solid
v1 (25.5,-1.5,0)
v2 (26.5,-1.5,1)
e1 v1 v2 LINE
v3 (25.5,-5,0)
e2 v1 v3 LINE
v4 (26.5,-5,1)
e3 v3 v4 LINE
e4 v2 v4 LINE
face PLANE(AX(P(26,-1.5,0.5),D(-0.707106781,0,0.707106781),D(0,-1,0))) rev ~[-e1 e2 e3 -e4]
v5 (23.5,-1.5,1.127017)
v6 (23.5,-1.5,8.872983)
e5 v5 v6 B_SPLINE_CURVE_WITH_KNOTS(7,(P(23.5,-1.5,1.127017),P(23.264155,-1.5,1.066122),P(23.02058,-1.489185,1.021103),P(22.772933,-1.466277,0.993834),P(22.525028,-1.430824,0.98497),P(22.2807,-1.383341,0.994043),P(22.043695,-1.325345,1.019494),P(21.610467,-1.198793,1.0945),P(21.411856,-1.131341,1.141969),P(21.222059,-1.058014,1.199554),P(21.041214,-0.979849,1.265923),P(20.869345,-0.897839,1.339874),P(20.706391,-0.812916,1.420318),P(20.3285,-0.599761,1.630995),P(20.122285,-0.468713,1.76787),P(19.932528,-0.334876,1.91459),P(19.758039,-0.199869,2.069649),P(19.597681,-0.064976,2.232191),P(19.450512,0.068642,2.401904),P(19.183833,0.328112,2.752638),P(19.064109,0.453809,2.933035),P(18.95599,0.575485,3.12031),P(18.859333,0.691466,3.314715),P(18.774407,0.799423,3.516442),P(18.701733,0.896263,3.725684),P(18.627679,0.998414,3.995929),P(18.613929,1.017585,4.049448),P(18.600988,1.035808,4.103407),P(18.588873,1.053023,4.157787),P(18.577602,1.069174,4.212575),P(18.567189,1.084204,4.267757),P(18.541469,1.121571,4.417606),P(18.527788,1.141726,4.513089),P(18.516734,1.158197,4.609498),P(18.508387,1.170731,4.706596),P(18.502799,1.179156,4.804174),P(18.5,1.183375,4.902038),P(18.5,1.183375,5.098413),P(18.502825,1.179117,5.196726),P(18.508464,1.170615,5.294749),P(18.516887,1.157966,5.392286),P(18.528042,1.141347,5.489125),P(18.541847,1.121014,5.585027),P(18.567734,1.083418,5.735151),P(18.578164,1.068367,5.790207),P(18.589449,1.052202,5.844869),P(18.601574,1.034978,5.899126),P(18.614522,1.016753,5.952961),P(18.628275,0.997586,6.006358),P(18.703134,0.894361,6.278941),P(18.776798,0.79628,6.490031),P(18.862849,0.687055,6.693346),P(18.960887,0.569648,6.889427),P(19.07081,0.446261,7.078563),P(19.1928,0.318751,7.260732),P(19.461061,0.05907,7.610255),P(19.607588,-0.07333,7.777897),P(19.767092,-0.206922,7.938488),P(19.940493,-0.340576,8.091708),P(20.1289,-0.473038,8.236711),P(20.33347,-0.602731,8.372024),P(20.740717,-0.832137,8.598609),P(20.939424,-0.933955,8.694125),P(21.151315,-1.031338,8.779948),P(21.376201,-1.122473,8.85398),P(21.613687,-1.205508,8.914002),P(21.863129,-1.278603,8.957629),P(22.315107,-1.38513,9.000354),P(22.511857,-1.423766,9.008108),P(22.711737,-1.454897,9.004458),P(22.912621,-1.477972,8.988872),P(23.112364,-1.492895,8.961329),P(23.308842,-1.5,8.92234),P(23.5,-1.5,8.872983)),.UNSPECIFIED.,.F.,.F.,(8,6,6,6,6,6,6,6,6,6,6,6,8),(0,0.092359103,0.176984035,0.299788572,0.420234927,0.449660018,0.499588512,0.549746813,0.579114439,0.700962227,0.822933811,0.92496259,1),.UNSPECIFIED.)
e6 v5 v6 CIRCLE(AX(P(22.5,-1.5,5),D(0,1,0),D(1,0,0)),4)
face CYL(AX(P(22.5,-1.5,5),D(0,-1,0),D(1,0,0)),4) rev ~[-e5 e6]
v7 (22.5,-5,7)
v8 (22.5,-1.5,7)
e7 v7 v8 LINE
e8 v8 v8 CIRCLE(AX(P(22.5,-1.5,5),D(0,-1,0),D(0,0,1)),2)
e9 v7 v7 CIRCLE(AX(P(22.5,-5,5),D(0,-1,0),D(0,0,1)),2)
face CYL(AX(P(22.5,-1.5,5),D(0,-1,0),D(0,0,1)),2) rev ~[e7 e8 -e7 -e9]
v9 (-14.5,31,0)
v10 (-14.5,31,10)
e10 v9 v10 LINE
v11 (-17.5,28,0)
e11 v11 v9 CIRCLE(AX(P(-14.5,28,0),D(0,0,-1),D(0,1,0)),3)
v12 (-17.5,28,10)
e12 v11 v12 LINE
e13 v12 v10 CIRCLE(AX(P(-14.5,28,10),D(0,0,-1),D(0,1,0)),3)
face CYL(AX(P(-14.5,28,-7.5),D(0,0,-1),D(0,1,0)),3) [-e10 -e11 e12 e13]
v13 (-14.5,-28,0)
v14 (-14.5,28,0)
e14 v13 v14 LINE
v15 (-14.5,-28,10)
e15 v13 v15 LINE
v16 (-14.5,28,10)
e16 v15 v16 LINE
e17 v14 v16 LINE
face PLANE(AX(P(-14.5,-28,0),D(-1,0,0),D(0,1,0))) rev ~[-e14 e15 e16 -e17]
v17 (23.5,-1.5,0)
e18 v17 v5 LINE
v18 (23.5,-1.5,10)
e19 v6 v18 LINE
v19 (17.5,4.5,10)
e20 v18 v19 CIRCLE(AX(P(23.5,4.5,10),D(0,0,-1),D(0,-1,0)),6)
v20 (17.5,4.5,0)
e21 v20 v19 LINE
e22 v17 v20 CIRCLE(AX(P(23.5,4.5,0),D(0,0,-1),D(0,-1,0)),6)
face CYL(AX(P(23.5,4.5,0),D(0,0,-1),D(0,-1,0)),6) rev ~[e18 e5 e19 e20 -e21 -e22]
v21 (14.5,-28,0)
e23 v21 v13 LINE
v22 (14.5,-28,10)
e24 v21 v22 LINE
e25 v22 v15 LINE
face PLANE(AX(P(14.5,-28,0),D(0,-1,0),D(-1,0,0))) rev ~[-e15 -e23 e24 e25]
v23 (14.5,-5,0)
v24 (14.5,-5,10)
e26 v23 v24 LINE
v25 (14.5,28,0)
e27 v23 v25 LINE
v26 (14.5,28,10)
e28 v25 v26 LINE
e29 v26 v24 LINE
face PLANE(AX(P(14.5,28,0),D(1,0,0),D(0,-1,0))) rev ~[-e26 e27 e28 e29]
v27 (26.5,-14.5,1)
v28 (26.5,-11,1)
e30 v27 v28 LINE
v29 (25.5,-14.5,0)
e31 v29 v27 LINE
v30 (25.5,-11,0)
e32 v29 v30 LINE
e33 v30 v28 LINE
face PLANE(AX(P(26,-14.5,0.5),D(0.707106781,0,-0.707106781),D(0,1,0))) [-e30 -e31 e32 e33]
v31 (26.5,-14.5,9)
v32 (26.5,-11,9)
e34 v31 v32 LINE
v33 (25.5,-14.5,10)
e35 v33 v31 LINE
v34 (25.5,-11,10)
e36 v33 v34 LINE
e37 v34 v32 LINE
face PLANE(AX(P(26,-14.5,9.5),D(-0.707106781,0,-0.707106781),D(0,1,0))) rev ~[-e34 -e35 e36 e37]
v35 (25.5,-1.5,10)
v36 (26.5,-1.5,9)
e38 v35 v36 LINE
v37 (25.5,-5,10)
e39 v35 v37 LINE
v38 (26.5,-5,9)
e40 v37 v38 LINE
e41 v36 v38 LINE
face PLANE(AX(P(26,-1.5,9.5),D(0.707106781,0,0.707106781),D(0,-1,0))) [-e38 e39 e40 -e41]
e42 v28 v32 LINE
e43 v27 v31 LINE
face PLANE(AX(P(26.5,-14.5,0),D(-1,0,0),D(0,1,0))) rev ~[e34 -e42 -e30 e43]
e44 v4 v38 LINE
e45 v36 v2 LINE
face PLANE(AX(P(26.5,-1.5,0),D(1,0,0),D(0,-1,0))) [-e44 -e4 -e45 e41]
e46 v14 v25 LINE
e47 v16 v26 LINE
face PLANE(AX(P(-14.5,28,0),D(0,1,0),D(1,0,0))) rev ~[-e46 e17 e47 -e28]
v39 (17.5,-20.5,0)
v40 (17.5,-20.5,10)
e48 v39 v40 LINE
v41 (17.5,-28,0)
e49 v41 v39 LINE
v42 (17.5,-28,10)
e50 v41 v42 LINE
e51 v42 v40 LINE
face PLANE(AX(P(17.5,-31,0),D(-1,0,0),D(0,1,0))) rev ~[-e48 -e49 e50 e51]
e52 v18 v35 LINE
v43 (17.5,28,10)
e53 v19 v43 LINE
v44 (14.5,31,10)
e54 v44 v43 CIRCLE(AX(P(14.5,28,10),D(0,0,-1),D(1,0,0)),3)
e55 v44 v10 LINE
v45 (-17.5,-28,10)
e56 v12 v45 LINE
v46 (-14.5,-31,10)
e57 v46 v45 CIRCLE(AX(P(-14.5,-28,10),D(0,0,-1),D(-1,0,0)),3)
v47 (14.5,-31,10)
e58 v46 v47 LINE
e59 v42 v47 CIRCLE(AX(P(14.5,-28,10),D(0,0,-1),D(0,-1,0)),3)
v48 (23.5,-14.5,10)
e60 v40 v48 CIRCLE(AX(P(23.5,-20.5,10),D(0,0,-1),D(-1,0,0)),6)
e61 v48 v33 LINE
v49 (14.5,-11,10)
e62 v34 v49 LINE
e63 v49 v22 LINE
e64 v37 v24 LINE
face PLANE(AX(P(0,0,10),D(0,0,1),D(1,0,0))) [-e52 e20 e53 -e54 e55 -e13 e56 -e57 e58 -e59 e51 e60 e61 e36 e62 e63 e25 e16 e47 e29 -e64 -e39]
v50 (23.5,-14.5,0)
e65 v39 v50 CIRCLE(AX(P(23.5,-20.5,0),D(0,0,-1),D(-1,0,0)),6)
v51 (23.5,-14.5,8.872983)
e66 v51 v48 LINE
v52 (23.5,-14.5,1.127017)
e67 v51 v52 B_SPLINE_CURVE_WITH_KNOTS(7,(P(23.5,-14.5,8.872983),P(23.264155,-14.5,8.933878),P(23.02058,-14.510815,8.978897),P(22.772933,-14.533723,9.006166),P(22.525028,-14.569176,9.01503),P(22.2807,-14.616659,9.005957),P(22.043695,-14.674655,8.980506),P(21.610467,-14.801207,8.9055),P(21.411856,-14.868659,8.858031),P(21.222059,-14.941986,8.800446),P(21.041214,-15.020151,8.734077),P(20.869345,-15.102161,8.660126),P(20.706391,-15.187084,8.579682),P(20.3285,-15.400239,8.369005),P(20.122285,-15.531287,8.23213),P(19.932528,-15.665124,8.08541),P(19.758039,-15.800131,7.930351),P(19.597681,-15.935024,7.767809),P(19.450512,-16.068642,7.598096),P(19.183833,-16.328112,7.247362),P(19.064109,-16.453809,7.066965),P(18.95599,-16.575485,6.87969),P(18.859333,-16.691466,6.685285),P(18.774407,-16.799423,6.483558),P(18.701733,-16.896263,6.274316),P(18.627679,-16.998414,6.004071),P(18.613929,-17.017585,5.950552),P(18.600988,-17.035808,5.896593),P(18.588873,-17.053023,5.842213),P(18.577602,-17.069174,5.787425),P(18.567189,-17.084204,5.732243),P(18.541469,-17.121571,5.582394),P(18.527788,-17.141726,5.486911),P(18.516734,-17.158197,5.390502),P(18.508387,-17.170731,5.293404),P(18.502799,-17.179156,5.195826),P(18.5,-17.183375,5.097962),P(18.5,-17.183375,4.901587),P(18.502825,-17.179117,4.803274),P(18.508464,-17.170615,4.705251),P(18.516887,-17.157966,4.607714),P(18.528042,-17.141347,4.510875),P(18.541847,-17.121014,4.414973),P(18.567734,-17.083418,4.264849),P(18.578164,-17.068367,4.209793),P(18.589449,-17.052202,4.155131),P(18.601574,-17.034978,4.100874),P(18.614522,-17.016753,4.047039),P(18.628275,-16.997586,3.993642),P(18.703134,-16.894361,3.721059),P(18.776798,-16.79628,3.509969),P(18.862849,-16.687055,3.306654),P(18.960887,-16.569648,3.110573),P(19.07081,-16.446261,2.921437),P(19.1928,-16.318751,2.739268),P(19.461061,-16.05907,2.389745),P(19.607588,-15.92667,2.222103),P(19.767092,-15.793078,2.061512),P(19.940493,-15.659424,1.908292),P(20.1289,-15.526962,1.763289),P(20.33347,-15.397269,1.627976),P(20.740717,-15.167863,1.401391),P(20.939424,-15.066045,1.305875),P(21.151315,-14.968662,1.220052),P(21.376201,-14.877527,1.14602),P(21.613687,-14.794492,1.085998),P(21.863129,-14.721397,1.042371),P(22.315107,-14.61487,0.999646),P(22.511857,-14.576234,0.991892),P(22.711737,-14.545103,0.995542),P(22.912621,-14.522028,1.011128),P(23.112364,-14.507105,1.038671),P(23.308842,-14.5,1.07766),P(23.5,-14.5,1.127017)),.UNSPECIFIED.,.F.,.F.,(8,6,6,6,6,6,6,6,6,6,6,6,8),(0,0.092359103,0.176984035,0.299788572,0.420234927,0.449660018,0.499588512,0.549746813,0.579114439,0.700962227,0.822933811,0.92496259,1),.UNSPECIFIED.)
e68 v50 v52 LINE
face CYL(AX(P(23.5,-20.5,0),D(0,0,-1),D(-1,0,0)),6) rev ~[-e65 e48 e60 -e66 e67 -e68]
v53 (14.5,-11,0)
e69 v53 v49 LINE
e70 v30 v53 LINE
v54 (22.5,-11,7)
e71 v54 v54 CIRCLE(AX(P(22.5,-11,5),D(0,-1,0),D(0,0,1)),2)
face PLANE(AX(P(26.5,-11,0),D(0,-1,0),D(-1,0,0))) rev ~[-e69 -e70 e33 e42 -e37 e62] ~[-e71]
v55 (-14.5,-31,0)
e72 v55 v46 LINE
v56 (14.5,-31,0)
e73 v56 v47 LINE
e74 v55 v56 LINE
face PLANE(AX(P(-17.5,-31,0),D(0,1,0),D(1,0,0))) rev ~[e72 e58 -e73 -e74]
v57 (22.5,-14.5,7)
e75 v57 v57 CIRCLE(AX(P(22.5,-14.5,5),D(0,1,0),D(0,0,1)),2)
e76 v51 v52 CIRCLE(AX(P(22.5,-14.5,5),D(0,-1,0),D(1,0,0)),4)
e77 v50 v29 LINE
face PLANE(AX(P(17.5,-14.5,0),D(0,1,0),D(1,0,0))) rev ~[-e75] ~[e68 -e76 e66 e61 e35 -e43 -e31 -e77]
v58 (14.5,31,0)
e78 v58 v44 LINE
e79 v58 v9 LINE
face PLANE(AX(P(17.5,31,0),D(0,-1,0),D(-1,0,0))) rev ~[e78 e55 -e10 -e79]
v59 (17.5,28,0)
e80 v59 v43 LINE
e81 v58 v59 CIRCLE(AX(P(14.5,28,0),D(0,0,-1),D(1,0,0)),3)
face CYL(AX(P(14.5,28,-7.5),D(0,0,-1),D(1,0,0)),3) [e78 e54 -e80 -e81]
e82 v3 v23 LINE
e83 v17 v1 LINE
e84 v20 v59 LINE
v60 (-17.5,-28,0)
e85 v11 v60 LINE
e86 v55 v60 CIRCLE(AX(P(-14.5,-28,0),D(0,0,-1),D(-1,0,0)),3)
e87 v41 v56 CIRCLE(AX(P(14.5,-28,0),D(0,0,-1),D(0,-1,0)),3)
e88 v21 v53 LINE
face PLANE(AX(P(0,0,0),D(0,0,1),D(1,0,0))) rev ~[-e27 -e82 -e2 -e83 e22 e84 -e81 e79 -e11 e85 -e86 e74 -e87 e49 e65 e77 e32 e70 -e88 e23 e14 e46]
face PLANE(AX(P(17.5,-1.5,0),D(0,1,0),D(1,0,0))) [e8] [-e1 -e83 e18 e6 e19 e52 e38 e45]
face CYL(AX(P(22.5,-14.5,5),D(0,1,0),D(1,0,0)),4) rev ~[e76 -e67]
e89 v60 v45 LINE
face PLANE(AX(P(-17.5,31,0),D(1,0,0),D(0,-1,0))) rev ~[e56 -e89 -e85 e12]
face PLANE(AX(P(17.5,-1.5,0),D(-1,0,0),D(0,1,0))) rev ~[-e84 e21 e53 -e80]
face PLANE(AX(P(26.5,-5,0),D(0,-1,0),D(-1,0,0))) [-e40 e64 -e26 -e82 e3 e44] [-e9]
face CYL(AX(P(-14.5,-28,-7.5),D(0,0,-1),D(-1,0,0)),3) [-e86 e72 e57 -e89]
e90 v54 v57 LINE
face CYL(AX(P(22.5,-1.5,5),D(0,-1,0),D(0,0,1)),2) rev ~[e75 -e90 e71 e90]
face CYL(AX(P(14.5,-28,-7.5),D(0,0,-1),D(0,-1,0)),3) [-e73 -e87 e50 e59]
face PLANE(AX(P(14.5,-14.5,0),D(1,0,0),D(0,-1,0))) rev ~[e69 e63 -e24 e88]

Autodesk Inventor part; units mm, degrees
ref_plane "YZ Plane" through (0, 0, 0) normal (1, 0, 0) x (0, 1, 0)
ref_plane "XZ Plane" through (0, 0, 0) normal (0, 1, 0) x (-1, 0, 0)
ref_plane "XY Plane" through (0, 0, 0) normal (0, 0, 1) x (1, 0, 0)
sketch "Sketch1" plane through (0, 0, 0) normal (0, 0, 1) x (1, 0, 0)
  line L0 (-14.5, 28) -> (14.5, 28)
  line L1 (14.5, 28) -> (14.5, -28)
  line L2 (14.5, -28) -> (-14.5, -28)
  line L3 (-14.5, -28) -> (-14.5, 28)
  line L4 (17.5, 31) -> (-17.5, 31)
  line L5 (-17.5, 31) -> (-17.5, -31)
  line L6 (-17.5, -31) -> (17.5, -31)
  line L7 (14.5, -1.5) -> (26.5, -1.5)
  line L8 (14.5, -14.5) -> (26.5, -14.5)
  line L9 (17.5, -31) -> (17.5, -14.5)
  line L10 (17.5, -1.5) -> (17.5, 31)
  line L11 (26.5, -1.5) -> (26.5, -5)
  line L12 (26.5, -5) -> (14.5, -5)
  line L13 (26.5, -14.5) -> (26.5, -11)
  line L14 (26.5, -11) -> (14.5, -11)
  point P0 (0, 0)
  dimension "d0" = 29
  dimension "d1" = 56
  dimension "d2" = 14.5
  dimension "d3" = 28
  dimension "d4" = 3
  dimension "d5" = 12
  dimension "d6" = 3.5
  dimension "d7" = 3.5
  dimension "d8" = 6
  dimension "d9" = 32.5
  dimension "d10" = 62
extrude "Extrusion1" add sketch "Sketch1" along normal blind 10 contours L3 L2 L1 L8 L9 L6 L5 L4 L10 L7 L0 | L7 L11 L12 L1 | L1 L14 L13 L8
sketch "Sketch2" plane through (17.5, -1.5, 0) normal (0, 1, 0) x (1, 0, 0)
  line L0 (0, 0) -> (0, -10) projected
  line L1 (9, -10) -> (0, -10) projected
  line L2 (9, 0) -> (9, -10) projected
  line L3 (9, 0) -> (0, 0) projected
  point P0 (-17.5, 0)
  point P1 (5, -5)
  dimension "d13" = 4
hole "Hole1" at (22.5, -1.5, 5) direction (0, -1, 0) diameter 4 depth 13
chamfer "Chamfer1" distance 1 angle 45 4 edges at (26.5, -3.25, 0) (26.5, -3.25, 10) (26.5, -12.75, 10) (26.5, -12.75, 0)
fillet "Fillet1" radius 6 2 edges at (17.5, -14.5, 5) (17.5, -1.5, 5)
sketch "Sketch3" plane through (26.5, -1.5, 9) normal (0, 1, 0) x (1, 0, 0)
  line L0 (-3, -1) -> (-3, 2.2679) projected
  line L1 (-1, -1) -> (-3, -1) projected
  line L2 (0, 0) -> (-1, -1) projected
  line L3 (0, 8) -> (0, 0) projected
  line L4 (-1, 9) -> (0, 8) projected
  line L5 (-1, 9) -> (-3, 9) projected
  line L6 (-3, 5.7321) -> (-3, 9) projected
  arc A0 (-3, 2.2679) -> (-3, 5.7321) centre (-4, 4) ccw projected
  circle A1 centre (-4, 4) radius 4
  point P0 (-26.5, 9)
  dimension "d25" = 8
extrude "Extrusion2" cut sketch "Sketch3" along normal blind 10 contours A1 L6 A0 L0 | L0 A0 L6 A1
sketch "Sketch4" plane through (26.5, -14.5, 1) normal (0, -1, 0) x (1, 0, 0)
  line L0 (-3, -1) -> (-3, 2.2679) projected
  line L1 (-3, -1) -> (-1, -1) projected
  line L2 (0, 0) -> (-1, -1) projected
  line L3 (0, 0) -> (0, 8) projected
  line L4 (-1, 9) -> (0, 8) projected
  line L5 (-3, 9) -> (-1, 9) projected
  line L6 (-3, 5.7321) -> (-3, 9) projected
  arc A0 (-3, 2.2679) -> (-3, 5.7321) centre (-4, 4) ccw projected
  circle A1 centre (-4, 4) radius 4
  point P0 (-26.5, -1)
  dimension "d28" = 8
extrude "Extrusion3" cut sketch "Sketch4" along normal blind 10 contours A1 L6 A0 L0 | L0 A0 L6 A1
fillet "Fillet2" radius 3 4 edges at (17.5, 31, 5) (-17.5, 31, 5) (-17.5, -31, 5) (17.5, -31, 5)
equation "\"d2\" = 0.5 * d0"
equation "\"d3\" = 0.5 * d1"
equation "\"d7\" = d6"
properties part number "3DP_PLA_Battery_mount"
